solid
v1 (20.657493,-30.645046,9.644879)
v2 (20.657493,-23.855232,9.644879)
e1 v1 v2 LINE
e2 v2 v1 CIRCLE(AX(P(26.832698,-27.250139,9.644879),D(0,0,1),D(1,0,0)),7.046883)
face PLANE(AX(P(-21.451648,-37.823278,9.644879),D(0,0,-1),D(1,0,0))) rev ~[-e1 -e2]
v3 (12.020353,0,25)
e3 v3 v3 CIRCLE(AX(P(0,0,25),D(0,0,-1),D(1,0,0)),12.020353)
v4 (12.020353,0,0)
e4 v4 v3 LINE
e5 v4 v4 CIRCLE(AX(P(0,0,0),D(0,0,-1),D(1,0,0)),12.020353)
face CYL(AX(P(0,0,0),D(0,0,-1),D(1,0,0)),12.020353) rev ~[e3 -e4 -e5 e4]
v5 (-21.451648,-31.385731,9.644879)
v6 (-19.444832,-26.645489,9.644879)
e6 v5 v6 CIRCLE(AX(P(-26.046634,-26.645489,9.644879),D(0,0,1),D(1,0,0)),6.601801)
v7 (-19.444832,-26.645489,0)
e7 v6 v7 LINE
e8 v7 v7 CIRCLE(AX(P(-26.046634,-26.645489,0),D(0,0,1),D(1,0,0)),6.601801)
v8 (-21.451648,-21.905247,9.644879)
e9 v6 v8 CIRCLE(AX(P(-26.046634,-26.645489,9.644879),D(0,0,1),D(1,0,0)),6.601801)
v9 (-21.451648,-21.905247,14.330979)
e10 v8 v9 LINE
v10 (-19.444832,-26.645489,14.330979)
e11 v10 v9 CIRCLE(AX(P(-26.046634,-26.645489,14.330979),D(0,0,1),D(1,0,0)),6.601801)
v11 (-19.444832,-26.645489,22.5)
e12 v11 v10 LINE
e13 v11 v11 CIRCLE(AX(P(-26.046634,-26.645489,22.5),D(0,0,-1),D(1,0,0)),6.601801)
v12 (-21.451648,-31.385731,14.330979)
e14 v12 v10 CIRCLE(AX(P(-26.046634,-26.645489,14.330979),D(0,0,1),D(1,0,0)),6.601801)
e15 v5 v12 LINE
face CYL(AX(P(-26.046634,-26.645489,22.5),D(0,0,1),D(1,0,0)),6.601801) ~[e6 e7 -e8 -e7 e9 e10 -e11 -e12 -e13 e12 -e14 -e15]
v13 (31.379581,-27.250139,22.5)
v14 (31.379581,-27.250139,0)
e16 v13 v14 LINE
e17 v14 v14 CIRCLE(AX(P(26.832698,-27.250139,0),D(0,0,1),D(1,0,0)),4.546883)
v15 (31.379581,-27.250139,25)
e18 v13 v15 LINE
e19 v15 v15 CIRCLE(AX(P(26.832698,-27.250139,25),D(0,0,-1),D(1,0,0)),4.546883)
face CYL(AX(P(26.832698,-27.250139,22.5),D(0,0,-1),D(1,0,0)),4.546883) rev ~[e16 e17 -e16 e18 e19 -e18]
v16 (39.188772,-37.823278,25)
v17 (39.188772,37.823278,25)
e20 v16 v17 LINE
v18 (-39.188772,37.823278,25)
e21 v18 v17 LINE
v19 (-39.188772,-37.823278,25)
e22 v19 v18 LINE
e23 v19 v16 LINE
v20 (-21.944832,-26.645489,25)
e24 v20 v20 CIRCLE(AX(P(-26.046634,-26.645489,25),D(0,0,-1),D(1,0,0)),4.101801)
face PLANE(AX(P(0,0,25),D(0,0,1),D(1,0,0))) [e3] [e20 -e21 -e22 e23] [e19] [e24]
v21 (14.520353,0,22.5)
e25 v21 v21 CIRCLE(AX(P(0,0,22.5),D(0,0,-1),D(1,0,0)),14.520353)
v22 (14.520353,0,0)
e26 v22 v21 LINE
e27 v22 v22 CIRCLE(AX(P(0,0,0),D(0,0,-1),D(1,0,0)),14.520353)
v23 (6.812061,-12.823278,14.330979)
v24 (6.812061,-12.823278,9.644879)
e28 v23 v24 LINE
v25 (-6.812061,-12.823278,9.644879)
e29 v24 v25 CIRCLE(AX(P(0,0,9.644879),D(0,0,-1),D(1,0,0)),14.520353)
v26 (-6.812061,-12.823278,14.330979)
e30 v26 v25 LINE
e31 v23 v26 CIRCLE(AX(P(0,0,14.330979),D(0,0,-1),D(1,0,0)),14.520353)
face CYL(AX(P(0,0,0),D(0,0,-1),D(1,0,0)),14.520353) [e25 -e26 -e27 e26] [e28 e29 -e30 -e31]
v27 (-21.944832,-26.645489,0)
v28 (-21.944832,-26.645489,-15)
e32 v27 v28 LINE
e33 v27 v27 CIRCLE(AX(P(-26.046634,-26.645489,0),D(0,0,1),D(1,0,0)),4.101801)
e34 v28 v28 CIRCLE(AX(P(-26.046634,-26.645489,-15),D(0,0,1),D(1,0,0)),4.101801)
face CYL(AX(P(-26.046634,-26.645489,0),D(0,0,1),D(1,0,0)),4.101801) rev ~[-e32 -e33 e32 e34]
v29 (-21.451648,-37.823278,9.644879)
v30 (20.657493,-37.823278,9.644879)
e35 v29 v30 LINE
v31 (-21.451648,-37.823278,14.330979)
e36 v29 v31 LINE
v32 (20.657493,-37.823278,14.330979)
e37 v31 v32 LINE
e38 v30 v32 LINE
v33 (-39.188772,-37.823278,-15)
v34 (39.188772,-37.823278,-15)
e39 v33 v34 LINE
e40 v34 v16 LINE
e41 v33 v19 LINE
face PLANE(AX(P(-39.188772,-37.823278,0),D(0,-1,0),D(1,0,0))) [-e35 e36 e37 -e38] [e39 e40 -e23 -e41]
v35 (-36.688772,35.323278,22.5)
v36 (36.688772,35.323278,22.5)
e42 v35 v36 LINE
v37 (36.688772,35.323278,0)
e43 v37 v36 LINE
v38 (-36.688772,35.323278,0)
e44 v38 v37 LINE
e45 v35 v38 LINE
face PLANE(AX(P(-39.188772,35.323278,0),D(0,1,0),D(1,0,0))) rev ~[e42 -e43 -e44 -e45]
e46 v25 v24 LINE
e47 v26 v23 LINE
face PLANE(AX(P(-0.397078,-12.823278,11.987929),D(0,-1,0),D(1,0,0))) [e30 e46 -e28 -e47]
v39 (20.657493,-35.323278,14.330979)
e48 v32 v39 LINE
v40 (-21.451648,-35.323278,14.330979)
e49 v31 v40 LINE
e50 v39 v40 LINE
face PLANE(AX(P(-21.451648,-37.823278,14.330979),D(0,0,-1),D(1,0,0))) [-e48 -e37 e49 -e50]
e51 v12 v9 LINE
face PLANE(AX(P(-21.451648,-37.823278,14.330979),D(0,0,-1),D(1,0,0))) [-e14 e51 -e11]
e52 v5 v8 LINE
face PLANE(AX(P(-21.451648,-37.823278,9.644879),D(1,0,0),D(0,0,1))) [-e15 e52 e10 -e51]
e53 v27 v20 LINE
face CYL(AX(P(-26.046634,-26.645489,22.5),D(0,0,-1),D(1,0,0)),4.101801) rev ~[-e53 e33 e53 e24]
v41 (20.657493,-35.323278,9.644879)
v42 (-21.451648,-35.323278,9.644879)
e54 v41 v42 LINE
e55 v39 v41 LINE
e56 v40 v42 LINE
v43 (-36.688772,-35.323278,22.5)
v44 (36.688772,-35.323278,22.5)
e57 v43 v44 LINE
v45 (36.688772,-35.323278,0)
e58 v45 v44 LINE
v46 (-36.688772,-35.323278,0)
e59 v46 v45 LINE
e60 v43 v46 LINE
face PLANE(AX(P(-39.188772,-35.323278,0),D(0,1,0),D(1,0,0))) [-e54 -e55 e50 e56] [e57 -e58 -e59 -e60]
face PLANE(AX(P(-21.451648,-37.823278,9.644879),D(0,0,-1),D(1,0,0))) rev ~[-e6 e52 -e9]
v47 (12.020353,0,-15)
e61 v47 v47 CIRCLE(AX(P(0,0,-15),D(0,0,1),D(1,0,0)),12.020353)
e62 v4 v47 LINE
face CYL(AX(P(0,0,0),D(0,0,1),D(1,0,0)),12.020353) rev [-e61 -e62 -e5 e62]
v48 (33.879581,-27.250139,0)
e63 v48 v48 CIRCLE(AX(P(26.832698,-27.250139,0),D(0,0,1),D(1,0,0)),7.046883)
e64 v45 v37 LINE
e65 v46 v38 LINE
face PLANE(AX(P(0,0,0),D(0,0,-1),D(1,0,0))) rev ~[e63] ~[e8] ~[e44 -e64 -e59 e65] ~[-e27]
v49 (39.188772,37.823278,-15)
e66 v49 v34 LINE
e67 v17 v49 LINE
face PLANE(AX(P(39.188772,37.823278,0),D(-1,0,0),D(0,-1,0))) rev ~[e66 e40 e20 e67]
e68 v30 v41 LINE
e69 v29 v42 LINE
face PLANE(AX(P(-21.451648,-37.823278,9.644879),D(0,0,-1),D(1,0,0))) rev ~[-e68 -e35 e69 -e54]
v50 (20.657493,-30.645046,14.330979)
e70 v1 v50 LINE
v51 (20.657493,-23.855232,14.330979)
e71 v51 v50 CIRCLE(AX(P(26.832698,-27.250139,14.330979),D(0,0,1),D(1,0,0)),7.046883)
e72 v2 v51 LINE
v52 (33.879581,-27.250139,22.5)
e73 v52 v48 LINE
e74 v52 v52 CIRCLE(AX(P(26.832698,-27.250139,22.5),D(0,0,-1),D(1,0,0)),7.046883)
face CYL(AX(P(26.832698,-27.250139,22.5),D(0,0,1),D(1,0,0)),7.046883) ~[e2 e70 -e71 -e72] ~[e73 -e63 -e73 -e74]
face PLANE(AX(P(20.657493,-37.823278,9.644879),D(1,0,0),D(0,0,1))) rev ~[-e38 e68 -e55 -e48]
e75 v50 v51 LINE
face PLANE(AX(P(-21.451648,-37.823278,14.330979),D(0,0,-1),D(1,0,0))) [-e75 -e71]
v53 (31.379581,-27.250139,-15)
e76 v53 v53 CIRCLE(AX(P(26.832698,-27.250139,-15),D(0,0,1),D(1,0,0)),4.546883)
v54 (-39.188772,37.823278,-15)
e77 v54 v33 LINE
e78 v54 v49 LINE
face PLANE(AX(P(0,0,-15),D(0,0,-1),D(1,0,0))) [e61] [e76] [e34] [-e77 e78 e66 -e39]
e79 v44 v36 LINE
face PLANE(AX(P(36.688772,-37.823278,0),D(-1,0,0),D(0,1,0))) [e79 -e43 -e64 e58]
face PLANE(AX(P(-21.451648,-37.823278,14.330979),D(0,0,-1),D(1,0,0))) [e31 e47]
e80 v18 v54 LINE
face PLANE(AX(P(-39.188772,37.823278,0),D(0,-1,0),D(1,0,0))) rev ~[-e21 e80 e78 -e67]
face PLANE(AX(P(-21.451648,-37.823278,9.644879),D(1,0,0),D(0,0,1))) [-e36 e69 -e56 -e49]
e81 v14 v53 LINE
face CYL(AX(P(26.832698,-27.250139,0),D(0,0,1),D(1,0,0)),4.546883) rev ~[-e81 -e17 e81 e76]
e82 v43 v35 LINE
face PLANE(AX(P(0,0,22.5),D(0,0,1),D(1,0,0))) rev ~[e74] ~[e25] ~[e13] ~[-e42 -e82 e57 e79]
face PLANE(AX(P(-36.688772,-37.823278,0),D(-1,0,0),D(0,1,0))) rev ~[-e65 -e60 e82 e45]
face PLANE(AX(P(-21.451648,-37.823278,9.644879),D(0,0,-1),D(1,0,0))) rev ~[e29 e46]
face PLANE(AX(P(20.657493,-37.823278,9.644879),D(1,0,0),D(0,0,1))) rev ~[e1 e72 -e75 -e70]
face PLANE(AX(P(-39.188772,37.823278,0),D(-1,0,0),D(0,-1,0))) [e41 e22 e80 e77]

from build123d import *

# Parameters (mm, degrees)
F0_W         = 78.3775448799
F0_H         = 75.6465569139
F1_DEPTH     = 25
F2_R         = 12.0203528279
F3_DEPTH     = 49.9
F4_T         = -2.5
F5_R         = 6.6018014855
F6_DEPTH     = 25
F7_T         = 2.5
F7_T3_DEPTH  = 27.5
F7_T5_DEPTH  = 78.3775448799
F7_T7_DEPTH  = 75.6465569139
F8_DEPTH     = 25
F9_R         = 7.0468826158
F10_DEPTH    = 25
F11_T        = 2.5
F11_T3_DEPTH = 27.5
F11_T5_DEPTH = 78.3775448799
F11_T7_DEPTH = 75.6465569139
F12_DEPTH    = 25
F13_W        = 42.1091411263
F13_H        = 4.6861004084
F14_DEPTH    = 25
F15_W        = 78.3775448799
F15_H        = 75.6465569139
F16_DEPTH    = 15
F17_R        = 10.5957056812
F18_DEPTH    = 25
F19_DEPTH    = 25
F20_DEPTH    = 25
F21_DEPTH    = 25


# Not quite as in the source:
# - a shell that OpenCascade refuses in one call is made with other operations: the cavity is built on its own and cut out


with BuildPart() as f1:
    # F0 (on Top) → F1 (new body)
    with BuildSketch(Plane.XY):
        Rectangle(F0_W, F0_H)
    extrude(amount=F1_DEPTH)

    # F2 (on face) → F3 (cut)
    with BuildSketch(Plane(origin=(0, 0, 0), x_dir=(1, 0, 0), z_dir=(0, 0, -1))):
        Circle(F2_R)
    extrude(amount=-F3_DEPTH, mode=Mode.SUBTRACT)

    # F4
    f4_openings = [f1.faces().sort_by_distance(p)[0] for p in [
        (0, 36.733992, 0),
    ]]
    offset(amount=F4_T, openings=f4_openings)

    # F5 (on face) → F6 (join)
    with BuildSketch(Plane(origin=(0, 0, 22.5), x_dir=(1, 0, 0), z_dir=(0, 0, -1))):
        with Locations((-26.0466337204, 26.645489037)):
            Circle(F5_R)
    extrude(amount=F6_DEPTH)

    # F7: shell of thickness 2.5, made by hand


with BuildPart() as f7_core1:
    # F7_t2: copy of F1
    add(f1.part)

    # the walls: a layer under each face that stays
    f7_faces = [f7_core1.faces().sort_by_distance(p)[0] for p in [
        (0, 37.8232784569, 12.5),
        (39.18877244, 0, 12.5),
        (-39.18877244, 0, 12.5),
        (-36.7394741625, 7.0043108254, 0),
        (-26.1258482933, -25.2155189713, 25),
        (0, -37.8232784569, 12.5),
        (0, 35.3232784569, 11.25),
        (36.68877244, 0, 11.25),
        (0, -35.3232784569, 11.25),
        (-36.68877244, 0, 11.25),
        (-12.0203528279, 0, 12.5),
        (-24.4591816266, 0, 22.5),
        (-9.6802352186, -9.6802352186, 0),
        (-32.6484352059, -26.645489037, 10),
        (-14.5203528279, 0, 11.25),
    ]]
    thicken(f7_faces, amount=-F7_T, mode=Mode.SUBTRACT)

    # F7_s4 → F7_t3 (cut)
    with BuildSketch(Plane.XY.offset(-2.5)):
        Polygon((36.66377244, 35.2982784569), (36.68877244, 37.8232784569), (39.18877244, 37.8232784569), (39.18877244, 35.3232784569), align=None)
        Polygon((-36.66377244, 35.2982784569), (-36.68877244, 37.8232784569), (-39.18877244, 37.8232784569), (-39.18877244, 35.3232784569), align=None)
        Polygon((36.66377244, -35.2982784569), (39.18877244, -35.3232784569), (39.18877244, -37.8232784569), (36.68877244, -37.8232784569), align=None)
        Polygon((-36.66377244, -35.2982784569), (-36.68877244, -37.8232784569), (-39.18877244, -37.8232784569), (-39.18877244, -35.3232784569), align=None)
    extrude(amount=F7_T3_DEPTH, mode=Mode.SUBTRACT)

    # F7_s6 → F7_t5 (cut)
    with BuildSketch(Plane.YZ.offset(-39.18877244)):
        Polygon((35.2982784569, 22.475), (37.8232784569, 22.5), (37.8232784569, 25), (35.3232784569, 25), align=None)
        Polygon((-35.2982784569, 22.475), (-37.8232784569, 22.5), (-37.8232784569, 25), (-35.3232784569, 25), align=None)
    extrude(amount=F7_T5_DEPTH, mode=Mode.SUBTRACT)

    # F7_s8 → F7_t7 (cut)
    with BuildSketch(Plane.XZ.offset(-37.8232784569)):
        Polygon((36.66377244, 22.475), (39.18877244, 22.5), (39.18877244, 25), (36.68877244, 25), align=None)
        Polygon((-36.66377244, 22.475), (-39.18877244, 22.5), (-39.18877244, 25), (-36.68877244, 25), align=None)
    extrude(amount=F7_T7_DEPTH, mode=Mode.SUBTRACT)

    # F7_s9 → F7_t10 (revolve, cut)
    with BuildSketch(Plane.XZ.offset(26.645489037)):
        Polygon((-19.4198322349, 22.475), (-19.4448322349, 25), (-21.9448322349, 25), (-21.9448322349, 22.5), align=None)
    revolve(axis=Axis((-26.0466337204, -26.645489037, 22.5), (0, 0, -1)), mode=Mode.SUBTRACT)

    # F7_s11 → F7_t12 (revolve, cut)
    with BuildSketch(Plane.XZ):
        Polygon((14.5453528279, 22.475), (14.5203528279, 25), (12.0203528279, 25), (12.0203528279, 22.5), align=None)
    revolve(axis=Axis((0, 0, 22.5), (0, 0, -1)), mode=Mode.SUBTRACT)


with BuildPart() as f1_1:
    add(f1.part)

    # what is left inside the walls is the cavity
    f7_cavity = [f7_core1.part.solids().sort_by_distance(p)[0] for p in [
        (-30.123435, -26.645489, 5.833333),
    ]]
    add(f7_cavity, mode=Mode.SUBTRACT)

    # F8 (cut): a face of the model
    f8_faces = [f1_1.faces().sort_by_distance(p)[0] for p in [
        (-26.0466337204, -26.645489037, 22.5),
    ]]
    extrude(f8_faces, amount=-F8_DEPTH, mode=Mode.SUBTRACT)

    # F9 (on face) → F10 (join)
    with BuildSketch(Plane(origin=(0, 0, 22.5), x_dir=(1, 0, 0), z_dir=(0, 0, -1))):
        with Locations((26.8326979131, 27.2501390427)):
            Circle(F9_R)
    extrude(amount=F10_DEPTH)

    # F11: shell of thickness 2.5, made by hand


with BuildPart() as f11_core1:
    # F11_t2: copy of F1
    add(f1_1.part)

    # the walls: a layer under each face that stays
    f11_faces = [f11_core1.faces().sort_by_distance(p)[0] for p in [
        (0, 37.8232784569, 12.5),
        (39.18877244, 0, 12.5),
        (-39.18877244, 0, 12.5),
        (-36.7394741625, 7.0043108254, 0),
        (-26.1258482933, 0, 25),
        (0, -37.8232784569, 12.5),
        (0, 35.3232784569, 11.25),
        (36.68877244, 0, 11.25),
        (0, -35.3232784569, 11.25),
        (-36.68877244, 0, 11.25),
        (-30.1484352059, -26.645489037, 23.75),
        (-12.0203528279, 0, 12.5),
        (-24.4591816266, 0, 22.5),
        (-30.1484352059, -26.645489037, 10),
        (-9.6802352186, -9.6802352186, 0),
        (-32.6484352059, -26.645489037, 10),
        (19.7858152973, -27.2501390427, 10),
        (-14.5203528279, 0, 11.25),
        (-30.4478347107, -22.2442880467, -2.5),
    ]]
    thicken(f11_faces, amount=-F11_T, mode=Mode.SUBTRACT)

    # F11_s4 → F11_t3 (cut)
    with BuildSketch(Plane.XY.offset(-2.5)):
        Polygon((36.66377244, 35.2982784569), (36.68877244, 37.8232784569), (39.18877244, 37.8232784569), (39.18877244, 35.3232784569), align=None)
        Polygon((-36.66377244, 35.2982784569), (-36.68877244, 37.8232784569), (-39.18877244, 37.8232784569), (-39.18877244, 35.3232784569), align=None)
        Polygon((36.66377244, -35.2982784569), (39.18877244, -35.3232784569), (39.18877244, -37.8232784569), (36.68877244, -37.8232784569), align=None)
        Polygon((-36.66377244, -35.2982784569), (-36.68877244, -37.8232784569), (-39.18877244, -37.8232784569), (-39.18877244, -35.3232784569), align=None)
    extrude(amount=F11_T3_DEPTH, mode=Mode.SUBTRACT)

    # F11_s6 → F11_t5 (cut)
    with BuildSketch(Plane.YZ.offset(-39.18877244)):
        Polygon((35.2982784569, 22.475), (37.8232784569, 22.5), (37.8232784569, 25), (35.3232784569, 25), align=None)
        Polygon((-35.2982784569, 22.475), (-37.8232784569, 22.5), (-37.8232784569, 25), (-35.3232784569, 25), align=None)
    extrude(amount=F11_T5_DEPTH, mode=Mode.SUBTRACT)

    # F11_s8 → F11_t7 (cut)
    with BuildSketch(Plane.XZ.offset(-37.8232784569)):
        Polygon((36.66377244, 22.475), (39.18877244, 22.5), (39.18877244, 25), (36.68877244, 25), align=None)
        Polygon((-36.66377244, 22.475), (-39.18877244, 22.5), (-39.18877244, 25), (-36.68877244, 25), align=None)
    extrude(amount=F11_T7_DEPTH, mode=Mode.SUBTRACT)

    # F11_s9 → F11_t10 (revolve, cut)
    with BuildSketch(Plane.XZ.offset(26.645489037)):
        Polygon((-19.4198322349, 22.475), (-19.4448322349, 25), (-21.9448322349, 25), (-21.9448322349, 22.5), align=None)
    revolve(axis=Axis((-26.0466337204, -26.645489037, 22.5), (0, 0, -1)), mode=Mode.SUBTRACT)

    # F11_s11 → F11_t12 (revolve, cut)
    with BuildSketch(Plane.XZ.offset(27.2501390427)):
        Polygon((33.9045805288, 22.475), (33.8795805288, 25), (31.3795805288, 25), (31.3795805288, 22.5), align=None)
    revolve(axis=Axis((26.8326979131, -27.2501390427, 22.5), (0, 0, -1)), mode=Mode.SUBTRACT)

    # F11_s13 → F11_t14 (revolve, cut)
    with BuildSketch(Plane.XZ):
        Polygon((14.5453528279, 22.475), (14.5203528279, 25), (12.0203528279, 25), (12.0203528279, 22.5), align=None)
    revolve(axis=Axis((0, 0, 22.5), (0, 0, -1)), mode=Mode.SUBTRACT)


with BuildPart() as f1_2:
    add(f1_1.part)

    # what is left inside the walls is the cavity
    f11_cavity = [f11_core1.part.solids().sort_by_distance(p)[0] for p in [
        (22.310815, -27.250139, 5.833333),
    ]]
    add(f11_cavity, mode=Mode.SUBTRACT)

    # F12 (cut): a face of the model
    f12_faces = [f1_2.faces().sort_by_distance(p)[0] for p in [
        (26.8326979131, -27.2501390427, 22.5),
    ]]
    extrude(f12_faces, amount=-F12_DEPTH, mode=Mode.SUBTRACT)

    # F13 (on face) → F14 (cut)
    with BuildSketch(Plane.XZ.offset(37.8232784569)):
        with Locations((-0.3970777616, 11.9879292324)):
            Rectangle(F13_W, F13_H)
    extrude(amount=-F14_DEPTH, mode=Mode.SUBTRACT)

    # F15 (on face) → F16 (join)
    with BuildSketch(Plane(origin=(0, 0, 0), x_dir=(1, 0, 0), z_dir=(0, 0, -1))):
        Rectangle(F15_W, F15_H)
    extrude(amount=F16_DEPTH)

    # F17 (on face) → F18 (cut)
    with BuildSketch(Plane(origin=(0, 0, -15), x_dir=(1, 0, 0), z_dir=(0, 0, -1))):
        with Locations((-27.1771177649, 22.4702265114)):
            Circle(F17_R)
    extrude(amount=F18_DEPTH, mode=Mode.SUBTRACT)

    # F19 (cut): a face of the model
    f19_faces = [f1_2.faces().sort_by_distance(p)[0] for p in [
        (0, 0, 0),
    ]]
    extrude(f19_faces, amount=-F19_DEPTH, mode=Mode.SUBTRACT)

    # F20 (cut): a face of the model
    f20_faces = [f1_2.faces().sort_by_distance(p)[0] for p in [
        (-26.0466337204, -26.645489037, 0),
    ]]
    extrude(f20_faces, amount=-F20_DEPTH, mode=Mode.SUBTRACT)

    # F21 (cut): a face of the model
    f21_faces = [f1_2.faces().sort_by_distance(p)[0] for p in [
        (26.8326979131, -27.2501390427, 0),
    ]]
    extrude(f21_faces, amount=-F21_DEPTH, mode=Mode.SUBTRACT)


solid = f1_2.part
